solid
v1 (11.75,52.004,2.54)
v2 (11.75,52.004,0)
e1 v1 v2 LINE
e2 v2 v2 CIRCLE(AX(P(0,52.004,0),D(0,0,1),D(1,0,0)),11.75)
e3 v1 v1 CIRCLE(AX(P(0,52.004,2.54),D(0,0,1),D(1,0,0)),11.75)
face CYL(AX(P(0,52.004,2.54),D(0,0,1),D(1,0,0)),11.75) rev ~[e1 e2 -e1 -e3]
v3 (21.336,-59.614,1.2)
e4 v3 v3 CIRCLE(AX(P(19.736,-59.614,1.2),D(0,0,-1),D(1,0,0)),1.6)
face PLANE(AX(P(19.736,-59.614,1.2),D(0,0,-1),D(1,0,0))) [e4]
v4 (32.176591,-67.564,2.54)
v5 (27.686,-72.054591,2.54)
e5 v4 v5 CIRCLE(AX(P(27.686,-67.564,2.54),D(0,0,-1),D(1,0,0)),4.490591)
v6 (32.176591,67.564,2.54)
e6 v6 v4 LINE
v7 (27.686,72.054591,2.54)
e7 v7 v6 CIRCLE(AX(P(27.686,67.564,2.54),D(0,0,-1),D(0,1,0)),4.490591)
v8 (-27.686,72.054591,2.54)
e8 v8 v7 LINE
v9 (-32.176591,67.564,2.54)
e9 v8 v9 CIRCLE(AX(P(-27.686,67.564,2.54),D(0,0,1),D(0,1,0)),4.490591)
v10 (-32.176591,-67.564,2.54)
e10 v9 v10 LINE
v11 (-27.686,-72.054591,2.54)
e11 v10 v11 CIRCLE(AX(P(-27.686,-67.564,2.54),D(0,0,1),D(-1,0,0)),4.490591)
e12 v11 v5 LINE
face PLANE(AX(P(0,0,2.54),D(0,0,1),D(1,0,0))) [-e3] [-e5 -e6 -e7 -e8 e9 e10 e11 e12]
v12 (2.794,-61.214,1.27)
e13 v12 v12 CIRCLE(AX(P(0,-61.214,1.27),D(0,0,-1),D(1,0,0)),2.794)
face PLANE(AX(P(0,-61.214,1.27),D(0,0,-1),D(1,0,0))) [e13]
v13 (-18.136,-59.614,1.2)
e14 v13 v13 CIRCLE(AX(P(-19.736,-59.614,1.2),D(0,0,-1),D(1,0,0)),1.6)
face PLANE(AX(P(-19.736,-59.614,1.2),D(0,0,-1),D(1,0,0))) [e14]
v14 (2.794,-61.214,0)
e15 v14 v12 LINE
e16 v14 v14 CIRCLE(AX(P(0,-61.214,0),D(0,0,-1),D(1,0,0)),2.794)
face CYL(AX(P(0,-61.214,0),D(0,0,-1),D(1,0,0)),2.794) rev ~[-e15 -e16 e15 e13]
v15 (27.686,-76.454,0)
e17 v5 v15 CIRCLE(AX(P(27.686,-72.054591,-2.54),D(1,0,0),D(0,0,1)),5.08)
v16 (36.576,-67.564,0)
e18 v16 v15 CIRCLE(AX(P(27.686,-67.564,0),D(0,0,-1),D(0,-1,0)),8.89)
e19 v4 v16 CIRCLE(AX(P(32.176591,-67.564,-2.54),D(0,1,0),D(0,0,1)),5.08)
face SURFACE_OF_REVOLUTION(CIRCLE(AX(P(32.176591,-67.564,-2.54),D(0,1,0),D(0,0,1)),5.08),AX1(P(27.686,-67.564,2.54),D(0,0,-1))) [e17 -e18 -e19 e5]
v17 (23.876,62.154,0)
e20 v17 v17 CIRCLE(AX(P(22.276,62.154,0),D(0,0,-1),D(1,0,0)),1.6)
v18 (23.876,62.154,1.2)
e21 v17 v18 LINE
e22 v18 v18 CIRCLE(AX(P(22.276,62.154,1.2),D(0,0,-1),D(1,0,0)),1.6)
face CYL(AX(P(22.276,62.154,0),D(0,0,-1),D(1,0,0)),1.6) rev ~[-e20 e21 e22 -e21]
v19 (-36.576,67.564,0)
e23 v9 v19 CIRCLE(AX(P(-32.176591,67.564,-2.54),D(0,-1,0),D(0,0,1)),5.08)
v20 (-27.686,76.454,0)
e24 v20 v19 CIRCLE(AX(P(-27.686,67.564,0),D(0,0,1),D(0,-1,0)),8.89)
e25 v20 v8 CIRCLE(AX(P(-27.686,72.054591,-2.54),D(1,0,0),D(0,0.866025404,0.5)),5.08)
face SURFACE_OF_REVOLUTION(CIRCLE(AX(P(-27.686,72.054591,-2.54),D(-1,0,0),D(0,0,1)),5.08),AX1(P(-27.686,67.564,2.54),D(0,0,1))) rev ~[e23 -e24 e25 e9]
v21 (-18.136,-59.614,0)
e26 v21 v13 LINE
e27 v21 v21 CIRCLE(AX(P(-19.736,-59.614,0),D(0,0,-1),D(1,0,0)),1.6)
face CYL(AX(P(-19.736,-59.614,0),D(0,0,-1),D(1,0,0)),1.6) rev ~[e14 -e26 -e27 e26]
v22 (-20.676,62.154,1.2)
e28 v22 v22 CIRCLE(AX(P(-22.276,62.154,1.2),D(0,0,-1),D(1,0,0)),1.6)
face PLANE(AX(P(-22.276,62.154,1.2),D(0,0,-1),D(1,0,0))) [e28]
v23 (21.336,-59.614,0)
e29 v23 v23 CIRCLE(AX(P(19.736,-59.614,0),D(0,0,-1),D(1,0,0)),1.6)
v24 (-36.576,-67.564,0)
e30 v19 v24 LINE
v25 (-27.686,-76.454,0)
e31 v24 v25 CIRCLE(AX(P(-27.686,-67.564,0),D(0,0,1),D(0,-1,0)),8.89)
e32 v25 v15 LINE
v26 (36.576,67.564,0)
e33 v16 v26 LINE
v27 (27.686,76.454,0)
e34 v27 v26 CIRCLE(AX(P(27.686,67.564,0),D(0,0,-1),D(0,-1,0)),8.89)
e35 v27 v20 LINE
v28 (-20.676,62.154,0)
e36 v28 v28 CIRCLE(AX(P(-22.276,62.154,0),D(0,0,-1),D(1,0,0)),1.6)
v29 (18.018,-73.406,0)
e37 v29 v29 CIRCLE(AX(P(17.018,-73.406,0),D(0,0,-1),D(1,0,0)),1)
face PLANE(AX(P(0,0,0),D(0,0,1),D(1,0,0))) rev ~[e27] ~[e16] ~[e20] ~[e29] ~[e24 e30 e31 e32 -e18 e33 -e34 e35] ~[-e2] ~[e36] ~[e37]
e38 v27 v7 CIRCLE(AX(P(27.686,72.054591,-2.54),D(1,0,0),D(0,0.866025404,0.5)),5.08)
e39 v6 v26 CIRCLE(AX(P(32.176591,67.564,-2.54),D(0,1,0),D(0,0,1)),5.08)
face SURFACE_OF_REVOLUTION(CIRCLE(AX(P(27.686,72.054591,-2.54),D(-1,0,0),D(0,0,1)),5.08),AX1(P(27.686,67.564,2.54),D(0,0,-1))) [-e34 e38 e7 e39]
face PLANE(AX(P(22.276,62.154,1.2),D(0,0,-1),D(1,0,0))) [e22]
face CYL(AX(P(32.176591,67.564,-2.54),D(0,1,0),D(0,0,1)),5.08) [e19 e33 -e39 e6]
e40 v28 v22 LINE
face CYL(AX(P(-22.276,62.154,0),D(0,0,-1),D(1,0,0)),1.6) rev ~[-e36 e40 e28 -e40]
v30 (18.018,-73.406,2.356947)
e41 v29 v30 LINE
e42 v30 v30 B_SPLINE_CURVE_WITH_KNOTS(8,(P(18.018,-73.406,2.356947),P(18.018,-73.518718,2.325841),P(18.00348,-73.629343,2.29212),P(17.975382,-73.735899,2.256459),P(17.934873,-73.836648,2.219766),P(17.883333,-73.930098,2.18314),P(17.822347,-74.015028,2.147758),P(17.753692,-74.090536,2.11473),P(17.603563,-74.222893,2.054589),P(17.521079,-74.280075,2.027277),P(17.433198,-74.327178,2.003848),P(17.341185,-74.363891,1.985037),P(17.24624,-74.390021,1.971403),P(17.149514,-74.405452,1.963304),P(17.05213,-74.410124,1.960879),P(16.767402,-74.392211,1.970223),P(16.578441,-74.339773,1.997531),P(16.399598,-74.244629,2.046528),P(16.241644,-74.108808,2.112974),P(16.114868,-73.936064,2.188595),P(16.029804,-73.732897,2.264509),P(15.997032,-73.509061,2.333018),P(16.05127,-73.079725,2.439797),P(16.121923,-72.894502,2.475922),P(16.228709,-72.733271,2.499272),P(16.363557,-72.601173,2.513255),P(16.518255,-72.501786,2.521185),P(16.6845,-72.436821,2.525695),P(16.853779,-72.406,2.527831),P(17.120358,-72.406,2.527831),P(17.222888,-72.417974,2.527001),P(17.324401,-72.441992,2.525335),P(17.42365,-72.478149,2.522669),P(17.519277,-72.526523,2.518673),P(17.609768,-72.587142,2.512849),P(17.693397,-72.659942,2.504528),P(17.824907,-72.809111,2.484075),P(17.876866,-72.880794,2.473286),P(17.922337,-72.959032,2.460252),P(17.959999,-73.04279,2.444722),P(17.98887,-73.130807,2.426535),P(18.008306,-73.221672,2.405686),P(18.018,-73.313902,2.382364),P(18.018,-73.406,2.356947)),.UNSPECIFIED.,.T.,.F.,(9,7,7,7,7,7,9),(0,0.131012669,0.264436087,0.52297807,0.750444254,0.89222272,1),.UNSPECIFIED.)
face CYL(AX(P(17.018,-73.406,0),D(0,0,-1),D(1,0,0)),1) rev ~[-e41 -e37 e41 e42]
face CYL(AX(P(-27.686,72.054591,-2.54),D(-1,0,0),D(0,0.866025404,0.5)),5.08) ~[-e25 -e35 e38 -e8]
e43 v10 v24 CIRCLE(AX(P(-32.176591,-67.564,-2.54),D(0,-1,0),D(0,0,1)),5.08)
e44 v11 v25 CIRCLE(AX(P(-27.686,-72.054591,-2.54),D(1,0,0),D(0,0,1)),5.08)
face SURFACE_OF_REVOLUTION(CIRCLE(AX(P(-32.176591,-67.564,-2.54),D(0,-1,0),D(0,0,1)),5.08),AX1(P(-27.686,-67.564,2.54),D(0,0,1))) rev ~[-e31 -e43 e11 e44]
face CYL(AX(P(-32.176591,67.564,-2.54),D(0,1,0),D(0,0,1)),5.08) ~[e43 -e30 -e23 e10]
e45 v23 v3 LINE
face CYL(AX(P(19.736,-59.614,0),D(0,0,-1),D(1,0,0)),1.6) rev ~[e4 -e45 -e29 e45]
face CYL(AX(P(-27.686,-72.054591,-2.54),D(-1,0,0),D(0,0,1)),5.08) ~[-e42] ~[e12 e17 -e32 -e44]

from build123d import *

# Parameters (mm, degrees)
F1_DEPTH     = 2.54
F2_R         = 11.75
F3_DEPTH     = 2.541
F4_R         = 8.89
F5_T1_DEPTH  = 135.128
F5_T3_DEPTH  = 55.372
F5_T6_ANGLE  = 90
F5_T8_ANGLE  = 90
F5_T10_ANGLE = 90
F5_T12_ANGLE = 90
F6_R         = 1
F7_DEPTH     = 2.541
F9_R         = 1.6
F8_R         = 1.6
F10_DEPTH    = 1.2
F11_R        = 2.794
F12_DEPTH    = 1.27


# Not quite as in the source:
# - a fillet or chamfer that OpenCascade refuses, or shapes differently, is made with other operations: its cross-section is extruded or revolved along the edge and cut away or added


with BuildPart() as f1:
    # F0 (on Top) → F1 (new body)
    with BuildSketch(Plane.XY):
        Polygon((36.576, 76.454), (0, 76.454), (-36.576, 76.454), (-36.576, 0), (-36.576, -76.454), (0, -76.454), (36.576, -76.454), (36.576, 0), align=None)
    extrude(amount=F1_DEPTH)

    # F2 (on face) → F3 (cut, through all)
    with BuildSketch(Plane.XY.offset(2.54)):
        with Locations((0, 52.004)):
            Circle(F2_R)
    extrude(amount=-F3_DEPTH, mode=Mode.SUBTRACT)

    # F4
    f4_edges = [f1.edges().sort_by_distance(p)[0] for p in [
        (-36.576, 76.454, 1.27),
        (36.576, 76.454, 1.27),
        (36.576, -76.454, 1.27),
        (-36.576, -76.454, 1.27),
    ]]
    fillet(f4_edges, radius=F4_R)

    # F5: fillet of radius 5.08 on 1 edges, made by hand

    # F5_s2 → F5_t1 (cut)
    with BuildSketch(Plane.XZ.offset(-67.564)):
        with BuildLine():
            ThreePointArc((32.1765909488, 2.54), (34.7165909488, 1.8594090512), (36.576, 0))
            Line((36.576, 0), (36.576, 2.54))
            Line((36.576, 2.54), (32.1765909488, 2.54))
        make_face()
        with BuildLine():
            ThreePointArc((-32.1765909488, 2.54), (-34.7165909488, 1.8594090512), (-36.576, 0))
            Line((-36.576, 0), (-36.576, 2.54))
            Line((-36.576, 2.54), (-32.1765909488, 2.54))
        make_face()
    extrude(amount=F5_T1_DEPTH, mode=Mode.SUBTRACT)

    # F5_s4 → F5_t3 (cut)
    with BuildSketch(Plane.YZ.offset(-27.686)):
        with BuildLine():
            ThreePointArc((-72.0545909488, 2.54), (-74.5945909488, 1.8594090512), (-76.454, 0))
            Line((-76.454, 0), (-76.454, 2.54))
            Line((-76.454, 2.54), (-72.0545909488, 2.54))
        make_face()
        with BuildLine():
            ThreePointArc((76.454, 0), (74.5945909488, 1.8594090512), (72.0545909488, 2.54))
            Line((72.0545909488, 2.54), (76.454, 2.54))
            Line((76.454, 2.54), (76.454, 0))
        make_face()
    extrude(amount=F5_T3_DEPTH, mode=Mode.SUBTRACT)

    # F5_s5 → F5_t6 (revolve, cut)
    with BuildSketch(Plane.YZ.offset(27.686)):
        with BuildLine():
            ThreePointArc((72.0545909488, 2.54), (74.5945909488, 1.8594090512), (76.454, 0))
            Line((76.454, 0), (76.454, 2.54))
            Line((76.454, 2.54), (72.0545909488, 2.54))
        make_face()
    revolve(axis=Axis((27.686, 67.564, 2.54), (0, 0, -1)), revolution_arc=F5_T6_ANGLE, mode=Mode.SUBTRACT)

    # F5_s7 → F5_t8 (revolve, cut)
    with BuildSketch(Plane.XZ.offset(67.564)):
        with BuildLine():
            ThreePointArc((32.1765909488, 2.54), (34.7165909488, 1.8594090512), (36.576, 0))
            Line((36.576, 0), (36.576, 2.54))
            Line((36.576, 2.54), (32.1765909488, 2.54))
        make_face()
    revolve(axis=Axis((27.686, -67.564, 2.54), (0, 0, -1)), revolution_arc=F5_T8_ANGLE, mode=Mode.SUBTRACT)

    # F5_s9 → F5_t10 (revolve, cut)
    with BuildSketch(Plane.XZ.offset(67.564)):
        with BuildLine():
            ThreePointArc((-32.1765909488, 2.54), (-34.7165909488, 1.8594090512), (-36.576, 0))
            Line((-36.576, 0), (-36.576, 2.54))
            Line((-36.576, 2.54), (-32.1765909488, 2.54))
        make_face()
    revolve(axis=Axis((-27.686, -67.564, 2.54), (0, 0, 1)), revolution_arc=F5_T10_ANGLE, mode=Mode.SUBTRACT)

    # F5_s11 → F5_t12 (revolve, cut)
    with BuildSketch(Plane.YZ.offset(-27.686)):
        with BuildLine():
            ThreePointArc((72.0545909488, 2.54), (74.5945909488, 1.8594090512), (76.454, 0))
            Line((76.454, 0), (76.454, 2.54))
            Line((76.454, 2.54), (72.0545909488, 2.54))
        make_face()
    revolve(axis=Axis((-27.686, 67.564, 2.54), (0, 0, 1)), revolution_arc=F5_T12_ANGLE, mode=Mode.SUBTRACT)

    # F6 (on face) → F7 (cut, through all)
    with BuildSketch(Plane(origin=(0, 0, 0), x_dir=(1, 0, 0), z_dir=(0, 0, -1))):
        with Locations((17.018, 73.406)):
            Circle(F6_R)
    extrude(amount=-F7_DEPTH, mode=Mode.SUBTRACT)

    # F9 (on face) + F8 (on face) → F10 (cut)
    with BuildSketch(Plane(origin=(0, 0, 0), x_dir=(1, 0, 0), z_dir=(0, 0, -1))):
        with Locations((19.736, 59.614)):
            Circle(F9_R)
        with Locations((-19.736, 59.614)):
            Circle(F9_R)
    with BuildSketch(Plane(origin=(0, 0, 0), x_dir=(1, 0, 0), z_dir=(0, 0, -1))):
        with Locations((-22.276, -62.154)):
            Circle(F8_R)
        with Locations((22.276, -62.154)):
            Circle(F8_R)
    extrude(amount=-F10_DEPTH, mode=Mode.SUBTRACT)

    # F11 (on face) → F12 (cut)
    with BuildSketch(Plane(origin=(0, 0, 0), x_dir=(1, 0, 0), z_dir=(0, 0, -1))):
        with Locations((0, 61.214)):
            Circle(F11_R)
    extrude(amount=-F12_DEPTH, mode=Mode.SUBTRACT)


solid = f1.part
